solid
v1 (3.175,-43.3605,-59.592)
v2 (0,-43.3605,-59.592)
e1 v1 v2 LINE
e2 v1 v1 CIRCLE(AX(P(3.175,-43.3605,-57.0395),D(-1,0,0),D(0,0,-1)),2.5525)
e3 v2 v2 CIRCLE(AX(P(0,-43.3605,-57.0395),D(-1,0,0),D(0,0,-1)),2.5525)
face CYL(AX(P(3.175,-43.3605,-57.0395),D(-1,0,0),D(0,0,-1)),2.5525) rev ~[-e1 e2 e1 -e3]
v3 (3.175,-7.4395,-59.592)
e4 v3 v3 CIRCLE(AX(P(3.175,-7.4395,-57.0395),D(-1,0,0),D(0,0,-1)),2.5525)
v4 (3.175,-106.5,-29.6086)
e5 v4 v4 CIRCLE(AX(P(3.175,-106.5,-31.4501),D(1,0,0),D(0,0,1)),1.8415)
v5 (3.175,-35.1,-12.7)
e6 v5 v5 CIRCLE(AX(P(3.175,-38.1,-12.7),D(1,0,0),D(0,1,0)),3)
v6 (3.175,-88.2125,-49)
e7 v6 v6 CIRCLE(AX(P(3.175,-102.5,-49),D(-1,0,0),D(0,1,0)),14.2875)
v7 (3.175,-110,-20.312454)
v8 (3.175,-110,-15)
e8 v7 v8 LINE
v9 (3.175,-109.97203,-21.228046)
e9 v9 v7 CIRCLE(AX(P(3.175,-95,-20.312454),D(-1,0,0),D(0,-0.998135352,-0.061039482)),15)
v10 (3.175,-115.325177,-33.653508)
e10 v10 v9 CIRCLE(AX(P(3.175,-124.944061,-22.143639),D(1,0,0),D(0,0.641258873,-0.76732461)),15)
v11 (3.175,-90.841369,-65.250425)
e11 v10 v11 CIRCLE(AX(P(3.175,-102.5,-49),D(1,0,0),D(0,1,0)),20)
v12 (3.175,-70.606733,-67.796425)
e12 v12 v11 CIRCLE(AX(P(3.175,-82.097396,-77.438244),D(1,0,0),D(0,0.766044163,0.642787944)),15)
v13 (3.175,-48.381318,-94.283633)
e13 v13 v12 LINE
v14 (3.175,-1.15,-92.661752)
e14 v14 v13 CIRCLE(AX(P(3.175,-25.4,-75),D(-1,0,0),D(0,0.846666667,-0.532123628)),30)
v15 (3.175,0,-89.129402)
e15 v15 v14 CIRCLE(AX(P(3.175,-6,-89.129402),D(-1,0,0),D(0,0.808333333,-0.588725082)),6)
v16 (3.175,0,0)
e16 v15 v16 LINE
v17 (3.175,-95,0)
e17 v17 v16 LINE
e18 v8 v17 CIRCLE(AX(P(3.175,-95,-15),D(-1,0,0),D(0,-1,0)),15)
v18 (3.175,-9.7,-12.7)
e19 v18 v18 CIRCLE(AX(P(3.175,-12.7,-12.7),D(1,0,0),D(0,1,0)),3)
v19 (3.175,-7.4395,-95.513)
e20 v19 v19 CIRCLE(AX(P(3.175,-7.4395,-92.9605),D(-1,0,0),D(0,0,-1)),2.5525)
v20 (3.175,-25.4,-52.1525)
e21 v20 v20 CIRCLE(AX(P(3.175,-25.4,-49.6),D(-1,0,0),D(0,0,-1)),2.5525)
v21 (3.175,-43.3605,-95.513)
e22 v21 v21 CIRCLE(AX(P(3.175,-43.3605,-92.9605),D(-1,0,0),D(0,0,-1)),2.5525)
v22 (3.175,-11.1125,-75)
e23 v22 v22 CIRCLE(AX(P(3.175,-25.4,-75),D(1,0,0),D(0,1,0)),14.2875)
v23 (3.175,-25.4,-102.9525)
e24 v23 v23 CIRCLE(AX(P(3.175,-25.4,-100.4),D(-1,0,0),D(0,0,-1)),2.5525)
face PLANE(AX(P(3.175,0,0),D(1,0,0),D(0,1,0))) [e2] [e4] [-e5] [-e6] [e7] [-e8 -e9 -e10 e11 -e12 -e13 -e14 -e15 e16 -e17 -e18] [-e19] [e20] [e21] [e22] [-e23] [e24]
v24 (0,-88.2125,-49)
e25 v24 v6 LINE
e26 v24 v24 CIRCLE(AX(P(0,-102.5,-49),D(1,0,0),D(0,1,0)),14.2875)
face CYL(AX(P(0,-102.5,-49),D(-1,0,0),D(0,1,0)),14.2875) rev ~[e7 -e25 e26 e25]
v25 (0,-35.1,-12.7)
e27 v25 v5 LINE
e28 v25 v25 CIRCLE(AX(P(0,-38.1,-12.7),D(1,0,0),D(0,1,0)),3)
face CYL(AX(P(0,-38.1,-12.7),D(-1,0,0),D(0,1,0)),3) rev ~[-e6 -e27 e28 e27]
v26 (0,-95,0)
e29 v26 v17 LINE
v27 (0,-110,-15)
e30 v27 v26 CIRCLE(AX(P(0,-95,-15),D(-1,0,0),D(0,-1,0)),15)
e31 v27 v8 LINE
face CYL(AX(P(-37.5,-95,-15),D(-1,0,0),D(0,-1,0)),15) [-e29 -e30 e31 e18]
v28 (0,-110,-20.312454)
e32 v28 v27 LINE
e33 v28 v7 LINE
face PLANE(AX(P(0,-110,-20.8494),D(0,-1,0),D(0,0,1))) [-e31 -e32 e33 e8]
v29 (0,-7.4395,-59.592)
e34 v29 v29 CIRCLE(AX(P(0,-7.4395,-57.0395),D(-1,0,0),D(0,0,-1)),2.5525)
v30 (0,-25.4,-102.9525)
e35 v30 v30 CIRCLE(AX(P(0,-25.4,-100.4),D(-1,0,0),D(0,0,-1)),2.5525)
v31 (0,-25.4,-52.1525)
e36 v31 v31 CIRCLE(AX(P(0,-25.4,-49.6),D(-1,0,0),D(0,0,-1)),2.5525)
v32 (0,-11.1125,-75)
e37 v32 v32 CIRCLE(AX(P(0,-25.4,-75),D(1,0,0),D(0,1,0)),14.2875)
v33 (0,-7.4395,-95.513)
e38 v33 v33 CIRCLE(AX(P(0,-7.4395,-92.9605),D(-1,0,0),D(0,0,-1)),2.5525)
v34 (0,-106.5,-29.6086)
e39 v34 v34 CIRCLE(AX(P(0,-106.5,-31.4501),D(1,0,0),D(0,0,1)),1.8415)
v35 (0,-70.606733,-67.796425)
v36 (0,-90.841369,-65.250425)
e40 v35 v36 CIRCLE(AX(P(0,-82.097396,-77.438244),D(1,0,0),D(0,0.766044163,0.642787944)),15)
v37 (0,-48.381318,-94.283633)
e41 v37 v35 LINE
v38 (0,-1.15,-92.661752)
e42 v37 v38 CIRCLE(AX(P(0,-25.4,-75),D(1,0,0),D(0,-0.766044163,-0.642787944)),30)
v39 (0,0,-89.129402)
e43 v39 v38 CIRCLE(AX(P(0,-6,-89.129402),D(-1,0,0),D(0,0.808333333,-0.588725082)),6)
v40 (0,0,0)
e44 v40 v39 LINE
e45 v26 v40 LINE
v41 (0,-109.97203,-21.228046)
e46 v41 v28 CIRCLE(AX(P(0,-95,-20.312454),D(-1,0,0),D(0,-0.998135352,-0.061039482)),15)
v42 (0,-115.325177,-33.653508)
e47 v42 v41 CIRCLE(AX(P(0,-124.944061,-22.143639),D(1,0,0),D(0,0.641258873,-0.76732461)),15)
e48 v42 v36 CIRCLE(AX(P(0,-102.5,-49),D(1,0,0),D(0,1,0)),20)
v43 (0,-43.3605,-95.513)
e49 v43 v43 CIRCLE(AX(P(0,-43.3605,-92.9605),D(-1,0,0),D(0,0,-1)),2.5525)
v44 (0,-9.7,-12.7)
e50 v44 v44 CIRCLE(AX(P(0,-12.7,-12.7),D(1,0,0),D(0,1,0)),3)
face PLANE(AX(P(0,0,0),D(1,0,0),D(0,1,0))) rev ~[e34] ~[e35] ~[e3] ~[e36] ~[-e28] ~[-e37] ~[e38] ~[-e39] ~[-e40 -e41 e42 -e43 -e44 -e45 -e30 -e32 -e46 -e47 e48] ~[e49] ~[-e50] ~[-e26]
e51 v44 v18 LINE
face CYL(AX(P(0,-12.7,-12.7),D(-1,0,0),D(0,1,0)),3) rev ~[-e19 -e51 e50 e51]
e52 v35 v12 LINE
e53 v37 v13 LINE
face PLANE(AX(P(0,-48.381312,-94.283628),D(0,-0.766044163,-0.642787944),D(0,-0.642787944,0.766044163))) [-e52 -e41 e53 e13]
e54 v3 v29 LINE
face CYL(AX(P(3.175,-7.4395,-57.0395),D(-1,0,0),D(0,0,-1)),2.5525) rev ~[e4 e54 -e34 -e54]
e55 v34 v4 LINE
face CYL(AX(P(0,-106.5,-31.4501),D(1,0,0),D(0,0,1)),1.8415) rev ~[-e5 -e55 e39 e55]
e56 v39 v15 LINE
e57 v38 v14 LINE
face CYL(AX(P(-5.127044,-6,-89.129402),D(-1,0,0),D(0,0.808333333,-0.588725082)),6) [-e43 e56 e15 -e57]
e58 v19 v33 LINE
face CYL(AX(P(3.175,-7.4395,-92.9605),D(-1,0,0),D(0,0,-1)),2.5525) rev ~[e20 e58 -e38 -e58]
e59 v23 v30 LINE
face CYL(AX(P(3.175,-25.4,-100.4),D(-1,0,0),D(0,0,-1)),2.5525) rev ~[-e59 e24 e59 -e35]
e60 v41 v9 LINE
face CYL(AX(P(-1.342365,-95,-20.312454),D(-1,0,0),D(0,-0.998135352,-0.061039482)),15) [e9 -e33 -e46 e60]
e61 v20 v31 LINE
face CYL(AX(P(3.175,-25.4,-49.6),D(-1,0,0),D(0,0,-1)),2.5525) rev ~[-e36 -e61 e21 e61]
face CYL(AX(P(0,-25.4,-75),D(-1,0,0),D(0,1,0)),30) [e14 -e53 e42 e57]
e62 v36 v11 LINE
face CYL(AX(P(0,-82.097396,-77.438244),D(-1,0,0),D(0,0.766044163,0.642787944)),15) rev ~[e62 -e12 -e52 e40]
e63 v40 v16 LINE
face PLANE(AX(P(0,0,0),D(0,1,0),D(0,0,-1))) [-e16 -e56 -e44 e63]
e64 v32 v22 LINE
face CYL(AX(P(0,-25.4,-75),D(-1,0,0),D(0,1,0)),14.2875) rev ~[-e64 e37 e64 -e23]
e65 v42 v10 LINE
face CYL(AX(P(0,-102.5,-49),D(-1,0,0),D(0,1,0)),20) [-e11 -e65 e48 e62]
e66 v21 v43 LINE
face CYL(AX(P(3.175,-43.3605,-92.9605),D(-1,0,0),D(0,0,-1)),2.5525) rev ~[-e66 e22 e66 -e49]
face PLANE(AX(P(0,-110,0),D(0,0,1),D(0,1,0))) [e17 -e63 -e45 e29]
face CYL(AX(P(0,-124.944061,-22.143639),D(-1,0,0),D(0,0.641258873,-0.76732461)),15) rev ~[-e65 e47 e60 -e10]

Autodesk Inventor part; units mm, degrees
ref_plane "YZ Plane" through (0, 0, 0) normal (1, 0, 0) x (0, 1, 0)
ref_plane "XZ Plane" through (0, 0, 0) normal (0, 1, 0) x (-1, 0, 0)
ref_plane "XY Plane" through (0, 0, 0) normal (0, 0, 1) x (1, 0, 0)
sketch "Sketch1" plane through (0, 0, 0) normal (1, 0, 0) x (0, 1, 0)
  line L0 (-39.3892, -105) -> (-110, -20.8494)
  line L1 (-110, -20.8494) -> (-110, 0)
  line L2 (-110, 0) -> (0, 0)
  line L3 (0, 0) -> (0, -105)
  line L4 (0, -105) -> (-39.3892, -105)
  line L5 (-110, -20.8494) -> (-119.38, 0) construction
  line L6 (-119.38, 0) -> (-110, 0) construction
  line L7 (-50.8, -25.4) -> (0, -25.4) construction
  line L8 (0, -25.4) -> (0, 0) construction
  line L9 (0, 0) -> (-50.8, 0) construction
  line L10 (-50.8, 0) -> (-50.8, -25.4) construction
  line L11 (-50.8, -25.4) -> (0, 0) construction
  line L12 (0, -25.4) -> (-50.8, 0) construction
  circle A0 centre (-12.7, -12.7) radius 3
  circle A1 centre (-38.1, -12.7) radius 3
  circle A2 centre (-102.5, -49) radius 14.2875
  circle A3 centre (-25.4, -75) radius 14.2875
  circle A4 centre (-102.5, -49) radius 20
  circle A5 centre (-25.4, -75) radius 30
  line L13 (-50.8, -90.9637) -> (-50.8, -59.0363)
  line L14 (-102.5, -49) -> (-25.4, -75) construction
  point P0 (-25.4, -12.7)
  point P1 (-25.4, -25.4)
  point P2 (-103.1519, -29.0106)
  point P3 (-82.9275, -53.1131)
  point P4 (-50.8, -75)
  point P5 (-48.3813, -94.2836)
  point P6 (0, -90.9637)
  dimension "d0" = 50
  dimension "d1" = 119.38
  dimension "d2" = 50.8
  dimension "d3" = 25.4
  dimension "d4" = 25.4
  dimension "d5" = 12.7
  dimension "d6" = 6
  dimension "d7" = 6
  dimension "d8" = 28.575
  dimension "d9" = 102.5
  dimension "d10" = 49
  dimension "d13" = 110
  dimension "d16" = 60
  dimension "d17" = 25.4
  dimension "d18" = 25.4
  dimension "d20" = 40
  dimension "d44" = 81.3659
extrude "Plate1" add sketch "Sketch1" along normal blind 3.175 contours L0 A4 L1 L2 L3 A5 | A5 L13 L3 | A4 L0 A2 | L0 A2 A4 | A5 L13
fillet "Corner Round1" radius 15 4 edges at (1.5875, -82.9275, -53.1131) (1.5875, -103.1519, -29.0106) (1.5875, -110, -20.8494) (1.5875, -110, 0)
fillet "Corner Round1" radius 6 1 edges at (1.5875, 0, -90.9637)
sketch "Sketch2" plane through (0, 0, 0) normal (-1, 0, 0) x (0, 0, 1)
  circle A0 centre (-31.4501, -106.5) radius 4.5847
  circle A1 centre (-49, -102.5) radius 14.2875 projected
  point P0 (0, 0)
  dimension "d21" = 9.1694
  dimension "d22" = 18
  dimension "d23" = 4
hole "Hole1" at (0, -106.5, -31.4501) direction (1, 0, 0) diameter 3.683 end through all thread size "10-24 UNC" class "2B" standard "ANSI Unified Screw Threads"
sketch "Sketch3" plane through (3.175, 0, 0) normal (1, 0, 0) x (0, 0, -1)
  circle A0 centre (75, -25.4) radius 14.2875 projected
  circle A1 centre (75, -25.4) radius 25.4
  line L0 (49.6, -25.4) -> (100.4, -25.4)
  line L1 (92.9605, -7.4395) -> (57.0395, -7.4395)
  line L2 (75, -25.4) -> (57.0395, -7.4395)
  line L3 (92.9605, -43.3605) -> (57.0395, -43.3605)
  line L4 (75, -25.4) -> (92.9605, -43.3605)
  line L5 (25.4, -50.8) -> (0, -50.8)
  line L6 (0, -50.8) -> (0, 0)
  line L7 (0, 0) -> (25.4, 0)
  line L8 (25.4, 0) -> (25.4, -50.8)
  line L9 (25.4, -50.8) -> (0, 0) construction
  line L10 (0, -50.8) -> (25.4, 0) construction
  point P0 (12.7, -25.4)
  dimension "d31" = 50.8
  dimension "d32" = 45
  dimension "d40" = 25.4
  dimension "d41" = 50.8
hole "Hole2" at (3.175, -7.4395, -57.0395) at (3.175, -25.4, -49.6) at (3.175, -43.3605, -57.0395) at (3.175, -43.3605, -92.9605) at (3.175, -25.4, -100.4) at (3.175, -7.4395, -92.9605) direction (-1, 0, 0) diameter 5.105 end through all clearance for "Flat Head Machine Screw (82)" size "#10" standard "Ansi Unified Screw Threads"
equation "\"d5\" = 0.5 * d4"
equation "\"d7\" = d6"
equation "\"d29\" = Thickness"
equation "\"d14\" = Thickness"
equation "\"d18\" = d17"
equation "\"BendRadius\" = Thickness"
equation "\"BendReliefWidth\" = Thickness"
equation "\"BendReliefDepth\" = 0.5 * Thickness"
equation "\"CornerReliefSize\" = 4 * Thickness"
equation "\"MinimumRemnant\" = 2 * Thickness"
equation "\"TransitionRadius\" = BendRadius"
equation "\"JacobiRadiusSize\" = BendRadius"
equation "\"GapSize\" = Thickness"
equation "\"Thickness\" = 3.175"
properties part number "INSIDE_INTAKE_PLATE" material "Aluminum, 6061-T6"
